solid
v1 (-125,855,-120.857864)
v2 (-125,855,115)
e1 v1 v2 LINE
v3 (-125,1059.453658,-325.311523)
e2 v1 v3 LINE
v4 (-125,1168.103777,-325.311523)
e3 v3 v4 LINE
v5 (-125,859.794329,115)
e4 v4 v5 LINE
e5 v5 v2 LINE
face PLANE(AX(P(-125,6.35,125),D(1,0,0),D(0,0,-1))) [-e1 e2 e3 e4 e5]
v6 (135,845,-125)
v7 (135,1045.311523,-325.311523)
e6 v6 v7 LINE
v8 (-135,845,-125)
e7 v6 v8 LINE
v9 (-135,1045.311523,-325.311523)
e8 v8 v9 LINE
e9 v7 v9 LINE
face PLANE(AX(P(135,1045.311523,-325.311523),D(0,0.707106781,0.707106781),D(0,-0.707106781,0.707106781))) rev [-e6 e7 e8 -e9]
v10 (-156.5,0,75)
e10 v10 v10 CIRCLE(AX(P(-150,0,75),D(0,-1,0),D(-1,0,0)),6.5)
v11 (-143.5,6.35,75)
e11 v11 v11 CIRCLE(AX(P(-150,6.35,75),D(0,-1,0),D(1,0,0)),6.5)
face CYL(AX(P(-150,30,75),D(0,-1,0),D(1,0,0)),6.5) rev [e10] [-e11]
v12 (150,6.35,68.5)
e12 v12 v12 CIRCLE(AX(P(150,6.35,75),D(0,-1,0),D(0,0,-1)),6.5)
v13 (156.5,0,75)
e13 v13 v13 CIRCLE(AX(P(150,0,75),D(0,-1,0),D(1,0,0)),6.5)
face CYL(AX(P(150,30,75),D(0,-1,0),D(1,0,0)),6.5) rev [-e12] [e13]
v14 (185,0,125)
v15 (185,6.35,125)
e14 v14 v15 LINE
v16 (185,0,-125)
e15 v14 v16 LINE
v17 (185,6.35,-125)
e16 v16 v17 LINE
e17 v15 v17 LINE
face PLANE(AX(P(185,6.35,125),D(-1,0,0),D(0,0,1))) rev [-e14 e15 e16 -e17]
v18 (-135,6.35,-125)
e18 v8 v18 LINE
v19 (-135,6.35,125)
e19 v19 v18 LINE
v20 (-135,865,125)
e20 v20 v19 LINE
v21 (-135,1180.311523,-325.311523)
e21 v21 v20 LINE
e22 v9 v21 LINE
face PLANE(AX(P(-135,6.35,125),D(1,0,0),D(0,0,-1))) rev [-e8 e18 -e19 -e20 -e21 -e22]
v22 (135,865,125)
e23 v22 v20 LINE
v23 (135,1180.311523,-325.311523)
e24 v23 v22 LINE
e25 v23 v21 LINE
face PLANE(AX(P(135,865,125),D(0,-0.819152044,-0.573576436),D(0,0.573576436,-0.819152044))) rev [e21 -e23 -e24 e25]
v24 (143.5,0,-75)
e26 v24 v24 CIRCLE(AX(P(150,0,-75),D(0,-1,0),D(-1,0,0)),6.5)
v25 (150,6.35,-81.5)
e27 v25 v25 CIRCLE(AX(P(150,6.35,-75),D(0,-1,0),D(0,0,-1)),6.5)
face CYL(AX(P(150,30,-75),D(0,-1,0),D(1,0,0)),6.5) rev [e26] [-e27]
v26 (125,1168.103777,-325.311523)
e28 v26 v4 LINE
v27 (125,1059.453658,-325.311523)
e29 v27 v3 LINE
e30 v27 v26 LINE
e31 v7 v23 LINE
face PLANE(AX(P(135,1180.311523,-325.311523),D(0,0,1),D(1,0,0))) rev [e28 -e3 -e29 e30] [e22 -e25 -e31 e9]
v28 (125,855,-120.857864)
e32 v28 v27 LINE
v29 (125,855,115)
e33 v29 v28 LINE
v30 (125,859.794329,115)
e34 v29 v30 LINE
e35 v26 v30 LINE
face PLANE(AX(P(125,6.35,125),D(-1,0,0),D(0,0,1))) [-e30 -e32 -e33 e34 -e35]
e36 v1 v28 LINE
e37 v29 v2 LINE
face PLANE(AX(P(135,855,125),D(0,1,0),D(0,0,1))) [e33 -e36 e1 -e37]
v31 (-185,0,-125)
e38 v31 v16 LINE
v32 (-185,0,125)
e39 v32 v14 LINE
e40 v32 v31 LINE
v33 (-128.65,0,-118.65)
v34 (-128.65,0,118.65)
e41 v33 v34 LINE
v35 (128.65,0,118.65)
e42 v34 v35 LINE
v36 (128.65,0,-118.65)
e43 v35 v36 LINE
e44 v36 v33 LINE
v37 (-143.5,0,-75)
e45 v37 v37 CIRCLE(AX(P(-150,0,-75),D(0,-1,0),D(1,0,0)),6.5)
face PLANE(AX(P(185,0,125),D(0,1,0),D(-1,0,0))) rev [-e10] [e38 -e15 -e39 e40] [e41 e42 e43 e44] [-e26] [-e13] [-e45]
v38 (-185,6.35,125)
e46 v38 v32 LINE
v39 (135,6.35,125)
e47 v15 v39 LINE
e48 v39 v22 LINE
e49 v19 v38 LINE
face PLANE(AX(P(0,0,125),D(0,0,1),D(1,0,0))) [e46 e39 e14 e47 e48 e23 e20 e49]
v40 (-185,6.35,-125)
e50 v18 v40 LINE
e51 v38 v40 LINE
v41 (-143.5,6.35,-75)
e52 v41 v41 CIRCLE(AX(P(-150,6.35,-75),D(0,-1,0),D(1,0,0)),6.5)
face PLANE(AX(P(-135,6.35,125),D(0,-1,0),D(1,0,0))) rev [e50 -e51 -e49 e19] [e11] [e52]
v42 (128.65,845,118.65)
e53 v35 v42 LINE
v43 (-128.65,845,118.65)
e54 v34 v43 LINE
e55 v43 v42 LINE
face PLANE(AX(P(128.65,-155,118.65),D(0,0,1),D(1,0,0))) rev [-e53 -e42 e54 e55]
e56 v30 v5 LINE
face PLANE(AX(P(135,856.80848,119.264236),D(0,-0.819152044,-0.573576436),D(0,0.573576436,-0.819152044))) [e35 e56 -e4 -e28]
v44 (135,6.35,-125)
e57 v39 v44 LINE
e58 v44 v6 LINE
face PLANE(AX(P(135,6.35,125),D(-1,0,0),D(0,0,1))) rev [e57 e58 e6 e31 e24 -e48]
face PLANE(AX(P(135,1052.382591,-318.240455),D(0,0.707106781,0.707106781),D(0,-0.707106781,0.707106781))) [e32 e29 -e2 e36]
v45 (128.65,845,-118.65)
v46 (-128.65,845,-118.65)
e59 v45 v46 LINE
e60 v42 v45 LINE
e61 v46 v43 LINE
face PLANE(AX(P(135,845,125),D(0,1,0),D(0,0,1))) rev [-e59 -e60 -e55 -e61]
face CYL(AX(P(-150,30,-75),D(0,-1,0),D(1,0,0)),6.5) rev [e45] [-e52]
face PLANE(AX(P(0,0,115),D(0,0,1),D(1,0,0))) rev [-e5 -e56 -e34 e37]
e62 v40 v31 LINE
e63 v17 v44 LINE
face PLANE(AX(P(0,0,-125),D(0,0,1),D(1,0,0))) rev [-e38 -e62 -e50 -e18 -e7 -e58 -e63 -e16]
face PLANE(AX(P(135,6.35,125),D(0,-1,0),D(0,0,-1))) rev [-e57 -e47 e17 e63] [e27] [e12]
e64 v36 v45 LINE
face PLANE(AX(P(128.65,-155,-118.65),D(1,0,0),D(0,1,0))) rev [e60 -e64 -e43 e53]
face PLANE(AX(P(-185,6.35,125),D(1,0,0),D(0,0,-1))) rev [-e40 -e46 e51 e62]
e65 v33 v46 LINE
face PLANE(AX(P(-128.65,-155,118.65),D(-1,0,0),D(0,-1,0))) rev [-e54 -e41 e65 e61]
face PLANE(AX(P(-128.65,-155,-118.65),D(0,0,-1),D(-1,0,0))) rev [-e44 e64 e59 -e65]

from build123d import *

# Parameters (mm, degrees)
BOSS_EXTRUDE1_DEPTH = 125
SKETCH3_W           = 257.3
SKETCH3_H           = 237.3
CUT_EXTRUDE1_DEPTH  = 1000
BOSS_EXTRUDE2_DEPTH = 135
SHELL1_START        = -125
SHELL1_DEPTH        = 250
SKETCH6_R           = 6.5
CUT_EXTRUDE2_DEPTH  = 30


# Read off the part's stored shape, not the designer's step: Shell1
with BuildPart() as part:
    # Sketch2 → Boss-Extrude1 (new, symmetric)
    with BuildSketch(Plane.XY):
        Polygon((-135, 0), (135, 0), (185, 0), (185, 6.35), (135, 6.35), (135, 845), (-135, 845), (-135, 6.35), (-185, 6.35), (-185, 0), align=None)
    extrude(amount=BOSS_EXTRUDE1_DEPTH, both=True)

    # Sketch3 → Cut-Extrude1 (cut)
    with BuildSketch(Plane(origin=(0, 845, 0), x_dir=(1, 0, 0), z_dir=(0, 1, 0))):
        Rectangle(SKETCH3_W, SKETCH3_H)
    extrude(amount=-CUT_EXTRUDE1_DEPTH, mode=Mode.SUBTRACT)

    # Sketch5 → Boss-Extrude2 (add, symmetric)
    with BuildSketch(Plane(origin=(0, 0, 0), x_dir=(0, 0, -1), z_dir=(1, 0, 0))):
        Polygon((-125, 865), (325.311522824, 1180.311522824), (325.311522824, 1045.311522824), (125, 845), (-125, 845), align=None)
    extrude(amount=BOSS_EXTRUDE2_DEPTH, both=True)

    # Shell1 outline → Shell1 (cut)
    with BuildSketch(Plane.YZ.offset(SHELL1_START)):
        Polygon((855, 115), (855, -120.857864376), (1059.453658448, -325.311522824), (1168.103776937, -325.311522824), (859.794329494, 115), align=None)
    extrude(amount=SHELL1_DEPTH, mode=Mode.SUBTRACT)

    # Sketch6 → Cut-Extrude2 (cut)
    with BuildSketch(Plane.XZ):
        with Locations((150, 75)):
            Circle(SKETCH6_R)
        with Locations(Location((150, -75, 0), (0, 0, 270))):
            Circle(SKETCH6_R)
        with Locations((-150, 75)):
            Circle(SKETCH6_R)
        with Locations((-150, -75)):
            Circle(SKETCH6_R)
    extrude(amount=-CUT_EXTRUDE2_DEPTH, mode=Mode.SUBTRACT)


solid = part.part
